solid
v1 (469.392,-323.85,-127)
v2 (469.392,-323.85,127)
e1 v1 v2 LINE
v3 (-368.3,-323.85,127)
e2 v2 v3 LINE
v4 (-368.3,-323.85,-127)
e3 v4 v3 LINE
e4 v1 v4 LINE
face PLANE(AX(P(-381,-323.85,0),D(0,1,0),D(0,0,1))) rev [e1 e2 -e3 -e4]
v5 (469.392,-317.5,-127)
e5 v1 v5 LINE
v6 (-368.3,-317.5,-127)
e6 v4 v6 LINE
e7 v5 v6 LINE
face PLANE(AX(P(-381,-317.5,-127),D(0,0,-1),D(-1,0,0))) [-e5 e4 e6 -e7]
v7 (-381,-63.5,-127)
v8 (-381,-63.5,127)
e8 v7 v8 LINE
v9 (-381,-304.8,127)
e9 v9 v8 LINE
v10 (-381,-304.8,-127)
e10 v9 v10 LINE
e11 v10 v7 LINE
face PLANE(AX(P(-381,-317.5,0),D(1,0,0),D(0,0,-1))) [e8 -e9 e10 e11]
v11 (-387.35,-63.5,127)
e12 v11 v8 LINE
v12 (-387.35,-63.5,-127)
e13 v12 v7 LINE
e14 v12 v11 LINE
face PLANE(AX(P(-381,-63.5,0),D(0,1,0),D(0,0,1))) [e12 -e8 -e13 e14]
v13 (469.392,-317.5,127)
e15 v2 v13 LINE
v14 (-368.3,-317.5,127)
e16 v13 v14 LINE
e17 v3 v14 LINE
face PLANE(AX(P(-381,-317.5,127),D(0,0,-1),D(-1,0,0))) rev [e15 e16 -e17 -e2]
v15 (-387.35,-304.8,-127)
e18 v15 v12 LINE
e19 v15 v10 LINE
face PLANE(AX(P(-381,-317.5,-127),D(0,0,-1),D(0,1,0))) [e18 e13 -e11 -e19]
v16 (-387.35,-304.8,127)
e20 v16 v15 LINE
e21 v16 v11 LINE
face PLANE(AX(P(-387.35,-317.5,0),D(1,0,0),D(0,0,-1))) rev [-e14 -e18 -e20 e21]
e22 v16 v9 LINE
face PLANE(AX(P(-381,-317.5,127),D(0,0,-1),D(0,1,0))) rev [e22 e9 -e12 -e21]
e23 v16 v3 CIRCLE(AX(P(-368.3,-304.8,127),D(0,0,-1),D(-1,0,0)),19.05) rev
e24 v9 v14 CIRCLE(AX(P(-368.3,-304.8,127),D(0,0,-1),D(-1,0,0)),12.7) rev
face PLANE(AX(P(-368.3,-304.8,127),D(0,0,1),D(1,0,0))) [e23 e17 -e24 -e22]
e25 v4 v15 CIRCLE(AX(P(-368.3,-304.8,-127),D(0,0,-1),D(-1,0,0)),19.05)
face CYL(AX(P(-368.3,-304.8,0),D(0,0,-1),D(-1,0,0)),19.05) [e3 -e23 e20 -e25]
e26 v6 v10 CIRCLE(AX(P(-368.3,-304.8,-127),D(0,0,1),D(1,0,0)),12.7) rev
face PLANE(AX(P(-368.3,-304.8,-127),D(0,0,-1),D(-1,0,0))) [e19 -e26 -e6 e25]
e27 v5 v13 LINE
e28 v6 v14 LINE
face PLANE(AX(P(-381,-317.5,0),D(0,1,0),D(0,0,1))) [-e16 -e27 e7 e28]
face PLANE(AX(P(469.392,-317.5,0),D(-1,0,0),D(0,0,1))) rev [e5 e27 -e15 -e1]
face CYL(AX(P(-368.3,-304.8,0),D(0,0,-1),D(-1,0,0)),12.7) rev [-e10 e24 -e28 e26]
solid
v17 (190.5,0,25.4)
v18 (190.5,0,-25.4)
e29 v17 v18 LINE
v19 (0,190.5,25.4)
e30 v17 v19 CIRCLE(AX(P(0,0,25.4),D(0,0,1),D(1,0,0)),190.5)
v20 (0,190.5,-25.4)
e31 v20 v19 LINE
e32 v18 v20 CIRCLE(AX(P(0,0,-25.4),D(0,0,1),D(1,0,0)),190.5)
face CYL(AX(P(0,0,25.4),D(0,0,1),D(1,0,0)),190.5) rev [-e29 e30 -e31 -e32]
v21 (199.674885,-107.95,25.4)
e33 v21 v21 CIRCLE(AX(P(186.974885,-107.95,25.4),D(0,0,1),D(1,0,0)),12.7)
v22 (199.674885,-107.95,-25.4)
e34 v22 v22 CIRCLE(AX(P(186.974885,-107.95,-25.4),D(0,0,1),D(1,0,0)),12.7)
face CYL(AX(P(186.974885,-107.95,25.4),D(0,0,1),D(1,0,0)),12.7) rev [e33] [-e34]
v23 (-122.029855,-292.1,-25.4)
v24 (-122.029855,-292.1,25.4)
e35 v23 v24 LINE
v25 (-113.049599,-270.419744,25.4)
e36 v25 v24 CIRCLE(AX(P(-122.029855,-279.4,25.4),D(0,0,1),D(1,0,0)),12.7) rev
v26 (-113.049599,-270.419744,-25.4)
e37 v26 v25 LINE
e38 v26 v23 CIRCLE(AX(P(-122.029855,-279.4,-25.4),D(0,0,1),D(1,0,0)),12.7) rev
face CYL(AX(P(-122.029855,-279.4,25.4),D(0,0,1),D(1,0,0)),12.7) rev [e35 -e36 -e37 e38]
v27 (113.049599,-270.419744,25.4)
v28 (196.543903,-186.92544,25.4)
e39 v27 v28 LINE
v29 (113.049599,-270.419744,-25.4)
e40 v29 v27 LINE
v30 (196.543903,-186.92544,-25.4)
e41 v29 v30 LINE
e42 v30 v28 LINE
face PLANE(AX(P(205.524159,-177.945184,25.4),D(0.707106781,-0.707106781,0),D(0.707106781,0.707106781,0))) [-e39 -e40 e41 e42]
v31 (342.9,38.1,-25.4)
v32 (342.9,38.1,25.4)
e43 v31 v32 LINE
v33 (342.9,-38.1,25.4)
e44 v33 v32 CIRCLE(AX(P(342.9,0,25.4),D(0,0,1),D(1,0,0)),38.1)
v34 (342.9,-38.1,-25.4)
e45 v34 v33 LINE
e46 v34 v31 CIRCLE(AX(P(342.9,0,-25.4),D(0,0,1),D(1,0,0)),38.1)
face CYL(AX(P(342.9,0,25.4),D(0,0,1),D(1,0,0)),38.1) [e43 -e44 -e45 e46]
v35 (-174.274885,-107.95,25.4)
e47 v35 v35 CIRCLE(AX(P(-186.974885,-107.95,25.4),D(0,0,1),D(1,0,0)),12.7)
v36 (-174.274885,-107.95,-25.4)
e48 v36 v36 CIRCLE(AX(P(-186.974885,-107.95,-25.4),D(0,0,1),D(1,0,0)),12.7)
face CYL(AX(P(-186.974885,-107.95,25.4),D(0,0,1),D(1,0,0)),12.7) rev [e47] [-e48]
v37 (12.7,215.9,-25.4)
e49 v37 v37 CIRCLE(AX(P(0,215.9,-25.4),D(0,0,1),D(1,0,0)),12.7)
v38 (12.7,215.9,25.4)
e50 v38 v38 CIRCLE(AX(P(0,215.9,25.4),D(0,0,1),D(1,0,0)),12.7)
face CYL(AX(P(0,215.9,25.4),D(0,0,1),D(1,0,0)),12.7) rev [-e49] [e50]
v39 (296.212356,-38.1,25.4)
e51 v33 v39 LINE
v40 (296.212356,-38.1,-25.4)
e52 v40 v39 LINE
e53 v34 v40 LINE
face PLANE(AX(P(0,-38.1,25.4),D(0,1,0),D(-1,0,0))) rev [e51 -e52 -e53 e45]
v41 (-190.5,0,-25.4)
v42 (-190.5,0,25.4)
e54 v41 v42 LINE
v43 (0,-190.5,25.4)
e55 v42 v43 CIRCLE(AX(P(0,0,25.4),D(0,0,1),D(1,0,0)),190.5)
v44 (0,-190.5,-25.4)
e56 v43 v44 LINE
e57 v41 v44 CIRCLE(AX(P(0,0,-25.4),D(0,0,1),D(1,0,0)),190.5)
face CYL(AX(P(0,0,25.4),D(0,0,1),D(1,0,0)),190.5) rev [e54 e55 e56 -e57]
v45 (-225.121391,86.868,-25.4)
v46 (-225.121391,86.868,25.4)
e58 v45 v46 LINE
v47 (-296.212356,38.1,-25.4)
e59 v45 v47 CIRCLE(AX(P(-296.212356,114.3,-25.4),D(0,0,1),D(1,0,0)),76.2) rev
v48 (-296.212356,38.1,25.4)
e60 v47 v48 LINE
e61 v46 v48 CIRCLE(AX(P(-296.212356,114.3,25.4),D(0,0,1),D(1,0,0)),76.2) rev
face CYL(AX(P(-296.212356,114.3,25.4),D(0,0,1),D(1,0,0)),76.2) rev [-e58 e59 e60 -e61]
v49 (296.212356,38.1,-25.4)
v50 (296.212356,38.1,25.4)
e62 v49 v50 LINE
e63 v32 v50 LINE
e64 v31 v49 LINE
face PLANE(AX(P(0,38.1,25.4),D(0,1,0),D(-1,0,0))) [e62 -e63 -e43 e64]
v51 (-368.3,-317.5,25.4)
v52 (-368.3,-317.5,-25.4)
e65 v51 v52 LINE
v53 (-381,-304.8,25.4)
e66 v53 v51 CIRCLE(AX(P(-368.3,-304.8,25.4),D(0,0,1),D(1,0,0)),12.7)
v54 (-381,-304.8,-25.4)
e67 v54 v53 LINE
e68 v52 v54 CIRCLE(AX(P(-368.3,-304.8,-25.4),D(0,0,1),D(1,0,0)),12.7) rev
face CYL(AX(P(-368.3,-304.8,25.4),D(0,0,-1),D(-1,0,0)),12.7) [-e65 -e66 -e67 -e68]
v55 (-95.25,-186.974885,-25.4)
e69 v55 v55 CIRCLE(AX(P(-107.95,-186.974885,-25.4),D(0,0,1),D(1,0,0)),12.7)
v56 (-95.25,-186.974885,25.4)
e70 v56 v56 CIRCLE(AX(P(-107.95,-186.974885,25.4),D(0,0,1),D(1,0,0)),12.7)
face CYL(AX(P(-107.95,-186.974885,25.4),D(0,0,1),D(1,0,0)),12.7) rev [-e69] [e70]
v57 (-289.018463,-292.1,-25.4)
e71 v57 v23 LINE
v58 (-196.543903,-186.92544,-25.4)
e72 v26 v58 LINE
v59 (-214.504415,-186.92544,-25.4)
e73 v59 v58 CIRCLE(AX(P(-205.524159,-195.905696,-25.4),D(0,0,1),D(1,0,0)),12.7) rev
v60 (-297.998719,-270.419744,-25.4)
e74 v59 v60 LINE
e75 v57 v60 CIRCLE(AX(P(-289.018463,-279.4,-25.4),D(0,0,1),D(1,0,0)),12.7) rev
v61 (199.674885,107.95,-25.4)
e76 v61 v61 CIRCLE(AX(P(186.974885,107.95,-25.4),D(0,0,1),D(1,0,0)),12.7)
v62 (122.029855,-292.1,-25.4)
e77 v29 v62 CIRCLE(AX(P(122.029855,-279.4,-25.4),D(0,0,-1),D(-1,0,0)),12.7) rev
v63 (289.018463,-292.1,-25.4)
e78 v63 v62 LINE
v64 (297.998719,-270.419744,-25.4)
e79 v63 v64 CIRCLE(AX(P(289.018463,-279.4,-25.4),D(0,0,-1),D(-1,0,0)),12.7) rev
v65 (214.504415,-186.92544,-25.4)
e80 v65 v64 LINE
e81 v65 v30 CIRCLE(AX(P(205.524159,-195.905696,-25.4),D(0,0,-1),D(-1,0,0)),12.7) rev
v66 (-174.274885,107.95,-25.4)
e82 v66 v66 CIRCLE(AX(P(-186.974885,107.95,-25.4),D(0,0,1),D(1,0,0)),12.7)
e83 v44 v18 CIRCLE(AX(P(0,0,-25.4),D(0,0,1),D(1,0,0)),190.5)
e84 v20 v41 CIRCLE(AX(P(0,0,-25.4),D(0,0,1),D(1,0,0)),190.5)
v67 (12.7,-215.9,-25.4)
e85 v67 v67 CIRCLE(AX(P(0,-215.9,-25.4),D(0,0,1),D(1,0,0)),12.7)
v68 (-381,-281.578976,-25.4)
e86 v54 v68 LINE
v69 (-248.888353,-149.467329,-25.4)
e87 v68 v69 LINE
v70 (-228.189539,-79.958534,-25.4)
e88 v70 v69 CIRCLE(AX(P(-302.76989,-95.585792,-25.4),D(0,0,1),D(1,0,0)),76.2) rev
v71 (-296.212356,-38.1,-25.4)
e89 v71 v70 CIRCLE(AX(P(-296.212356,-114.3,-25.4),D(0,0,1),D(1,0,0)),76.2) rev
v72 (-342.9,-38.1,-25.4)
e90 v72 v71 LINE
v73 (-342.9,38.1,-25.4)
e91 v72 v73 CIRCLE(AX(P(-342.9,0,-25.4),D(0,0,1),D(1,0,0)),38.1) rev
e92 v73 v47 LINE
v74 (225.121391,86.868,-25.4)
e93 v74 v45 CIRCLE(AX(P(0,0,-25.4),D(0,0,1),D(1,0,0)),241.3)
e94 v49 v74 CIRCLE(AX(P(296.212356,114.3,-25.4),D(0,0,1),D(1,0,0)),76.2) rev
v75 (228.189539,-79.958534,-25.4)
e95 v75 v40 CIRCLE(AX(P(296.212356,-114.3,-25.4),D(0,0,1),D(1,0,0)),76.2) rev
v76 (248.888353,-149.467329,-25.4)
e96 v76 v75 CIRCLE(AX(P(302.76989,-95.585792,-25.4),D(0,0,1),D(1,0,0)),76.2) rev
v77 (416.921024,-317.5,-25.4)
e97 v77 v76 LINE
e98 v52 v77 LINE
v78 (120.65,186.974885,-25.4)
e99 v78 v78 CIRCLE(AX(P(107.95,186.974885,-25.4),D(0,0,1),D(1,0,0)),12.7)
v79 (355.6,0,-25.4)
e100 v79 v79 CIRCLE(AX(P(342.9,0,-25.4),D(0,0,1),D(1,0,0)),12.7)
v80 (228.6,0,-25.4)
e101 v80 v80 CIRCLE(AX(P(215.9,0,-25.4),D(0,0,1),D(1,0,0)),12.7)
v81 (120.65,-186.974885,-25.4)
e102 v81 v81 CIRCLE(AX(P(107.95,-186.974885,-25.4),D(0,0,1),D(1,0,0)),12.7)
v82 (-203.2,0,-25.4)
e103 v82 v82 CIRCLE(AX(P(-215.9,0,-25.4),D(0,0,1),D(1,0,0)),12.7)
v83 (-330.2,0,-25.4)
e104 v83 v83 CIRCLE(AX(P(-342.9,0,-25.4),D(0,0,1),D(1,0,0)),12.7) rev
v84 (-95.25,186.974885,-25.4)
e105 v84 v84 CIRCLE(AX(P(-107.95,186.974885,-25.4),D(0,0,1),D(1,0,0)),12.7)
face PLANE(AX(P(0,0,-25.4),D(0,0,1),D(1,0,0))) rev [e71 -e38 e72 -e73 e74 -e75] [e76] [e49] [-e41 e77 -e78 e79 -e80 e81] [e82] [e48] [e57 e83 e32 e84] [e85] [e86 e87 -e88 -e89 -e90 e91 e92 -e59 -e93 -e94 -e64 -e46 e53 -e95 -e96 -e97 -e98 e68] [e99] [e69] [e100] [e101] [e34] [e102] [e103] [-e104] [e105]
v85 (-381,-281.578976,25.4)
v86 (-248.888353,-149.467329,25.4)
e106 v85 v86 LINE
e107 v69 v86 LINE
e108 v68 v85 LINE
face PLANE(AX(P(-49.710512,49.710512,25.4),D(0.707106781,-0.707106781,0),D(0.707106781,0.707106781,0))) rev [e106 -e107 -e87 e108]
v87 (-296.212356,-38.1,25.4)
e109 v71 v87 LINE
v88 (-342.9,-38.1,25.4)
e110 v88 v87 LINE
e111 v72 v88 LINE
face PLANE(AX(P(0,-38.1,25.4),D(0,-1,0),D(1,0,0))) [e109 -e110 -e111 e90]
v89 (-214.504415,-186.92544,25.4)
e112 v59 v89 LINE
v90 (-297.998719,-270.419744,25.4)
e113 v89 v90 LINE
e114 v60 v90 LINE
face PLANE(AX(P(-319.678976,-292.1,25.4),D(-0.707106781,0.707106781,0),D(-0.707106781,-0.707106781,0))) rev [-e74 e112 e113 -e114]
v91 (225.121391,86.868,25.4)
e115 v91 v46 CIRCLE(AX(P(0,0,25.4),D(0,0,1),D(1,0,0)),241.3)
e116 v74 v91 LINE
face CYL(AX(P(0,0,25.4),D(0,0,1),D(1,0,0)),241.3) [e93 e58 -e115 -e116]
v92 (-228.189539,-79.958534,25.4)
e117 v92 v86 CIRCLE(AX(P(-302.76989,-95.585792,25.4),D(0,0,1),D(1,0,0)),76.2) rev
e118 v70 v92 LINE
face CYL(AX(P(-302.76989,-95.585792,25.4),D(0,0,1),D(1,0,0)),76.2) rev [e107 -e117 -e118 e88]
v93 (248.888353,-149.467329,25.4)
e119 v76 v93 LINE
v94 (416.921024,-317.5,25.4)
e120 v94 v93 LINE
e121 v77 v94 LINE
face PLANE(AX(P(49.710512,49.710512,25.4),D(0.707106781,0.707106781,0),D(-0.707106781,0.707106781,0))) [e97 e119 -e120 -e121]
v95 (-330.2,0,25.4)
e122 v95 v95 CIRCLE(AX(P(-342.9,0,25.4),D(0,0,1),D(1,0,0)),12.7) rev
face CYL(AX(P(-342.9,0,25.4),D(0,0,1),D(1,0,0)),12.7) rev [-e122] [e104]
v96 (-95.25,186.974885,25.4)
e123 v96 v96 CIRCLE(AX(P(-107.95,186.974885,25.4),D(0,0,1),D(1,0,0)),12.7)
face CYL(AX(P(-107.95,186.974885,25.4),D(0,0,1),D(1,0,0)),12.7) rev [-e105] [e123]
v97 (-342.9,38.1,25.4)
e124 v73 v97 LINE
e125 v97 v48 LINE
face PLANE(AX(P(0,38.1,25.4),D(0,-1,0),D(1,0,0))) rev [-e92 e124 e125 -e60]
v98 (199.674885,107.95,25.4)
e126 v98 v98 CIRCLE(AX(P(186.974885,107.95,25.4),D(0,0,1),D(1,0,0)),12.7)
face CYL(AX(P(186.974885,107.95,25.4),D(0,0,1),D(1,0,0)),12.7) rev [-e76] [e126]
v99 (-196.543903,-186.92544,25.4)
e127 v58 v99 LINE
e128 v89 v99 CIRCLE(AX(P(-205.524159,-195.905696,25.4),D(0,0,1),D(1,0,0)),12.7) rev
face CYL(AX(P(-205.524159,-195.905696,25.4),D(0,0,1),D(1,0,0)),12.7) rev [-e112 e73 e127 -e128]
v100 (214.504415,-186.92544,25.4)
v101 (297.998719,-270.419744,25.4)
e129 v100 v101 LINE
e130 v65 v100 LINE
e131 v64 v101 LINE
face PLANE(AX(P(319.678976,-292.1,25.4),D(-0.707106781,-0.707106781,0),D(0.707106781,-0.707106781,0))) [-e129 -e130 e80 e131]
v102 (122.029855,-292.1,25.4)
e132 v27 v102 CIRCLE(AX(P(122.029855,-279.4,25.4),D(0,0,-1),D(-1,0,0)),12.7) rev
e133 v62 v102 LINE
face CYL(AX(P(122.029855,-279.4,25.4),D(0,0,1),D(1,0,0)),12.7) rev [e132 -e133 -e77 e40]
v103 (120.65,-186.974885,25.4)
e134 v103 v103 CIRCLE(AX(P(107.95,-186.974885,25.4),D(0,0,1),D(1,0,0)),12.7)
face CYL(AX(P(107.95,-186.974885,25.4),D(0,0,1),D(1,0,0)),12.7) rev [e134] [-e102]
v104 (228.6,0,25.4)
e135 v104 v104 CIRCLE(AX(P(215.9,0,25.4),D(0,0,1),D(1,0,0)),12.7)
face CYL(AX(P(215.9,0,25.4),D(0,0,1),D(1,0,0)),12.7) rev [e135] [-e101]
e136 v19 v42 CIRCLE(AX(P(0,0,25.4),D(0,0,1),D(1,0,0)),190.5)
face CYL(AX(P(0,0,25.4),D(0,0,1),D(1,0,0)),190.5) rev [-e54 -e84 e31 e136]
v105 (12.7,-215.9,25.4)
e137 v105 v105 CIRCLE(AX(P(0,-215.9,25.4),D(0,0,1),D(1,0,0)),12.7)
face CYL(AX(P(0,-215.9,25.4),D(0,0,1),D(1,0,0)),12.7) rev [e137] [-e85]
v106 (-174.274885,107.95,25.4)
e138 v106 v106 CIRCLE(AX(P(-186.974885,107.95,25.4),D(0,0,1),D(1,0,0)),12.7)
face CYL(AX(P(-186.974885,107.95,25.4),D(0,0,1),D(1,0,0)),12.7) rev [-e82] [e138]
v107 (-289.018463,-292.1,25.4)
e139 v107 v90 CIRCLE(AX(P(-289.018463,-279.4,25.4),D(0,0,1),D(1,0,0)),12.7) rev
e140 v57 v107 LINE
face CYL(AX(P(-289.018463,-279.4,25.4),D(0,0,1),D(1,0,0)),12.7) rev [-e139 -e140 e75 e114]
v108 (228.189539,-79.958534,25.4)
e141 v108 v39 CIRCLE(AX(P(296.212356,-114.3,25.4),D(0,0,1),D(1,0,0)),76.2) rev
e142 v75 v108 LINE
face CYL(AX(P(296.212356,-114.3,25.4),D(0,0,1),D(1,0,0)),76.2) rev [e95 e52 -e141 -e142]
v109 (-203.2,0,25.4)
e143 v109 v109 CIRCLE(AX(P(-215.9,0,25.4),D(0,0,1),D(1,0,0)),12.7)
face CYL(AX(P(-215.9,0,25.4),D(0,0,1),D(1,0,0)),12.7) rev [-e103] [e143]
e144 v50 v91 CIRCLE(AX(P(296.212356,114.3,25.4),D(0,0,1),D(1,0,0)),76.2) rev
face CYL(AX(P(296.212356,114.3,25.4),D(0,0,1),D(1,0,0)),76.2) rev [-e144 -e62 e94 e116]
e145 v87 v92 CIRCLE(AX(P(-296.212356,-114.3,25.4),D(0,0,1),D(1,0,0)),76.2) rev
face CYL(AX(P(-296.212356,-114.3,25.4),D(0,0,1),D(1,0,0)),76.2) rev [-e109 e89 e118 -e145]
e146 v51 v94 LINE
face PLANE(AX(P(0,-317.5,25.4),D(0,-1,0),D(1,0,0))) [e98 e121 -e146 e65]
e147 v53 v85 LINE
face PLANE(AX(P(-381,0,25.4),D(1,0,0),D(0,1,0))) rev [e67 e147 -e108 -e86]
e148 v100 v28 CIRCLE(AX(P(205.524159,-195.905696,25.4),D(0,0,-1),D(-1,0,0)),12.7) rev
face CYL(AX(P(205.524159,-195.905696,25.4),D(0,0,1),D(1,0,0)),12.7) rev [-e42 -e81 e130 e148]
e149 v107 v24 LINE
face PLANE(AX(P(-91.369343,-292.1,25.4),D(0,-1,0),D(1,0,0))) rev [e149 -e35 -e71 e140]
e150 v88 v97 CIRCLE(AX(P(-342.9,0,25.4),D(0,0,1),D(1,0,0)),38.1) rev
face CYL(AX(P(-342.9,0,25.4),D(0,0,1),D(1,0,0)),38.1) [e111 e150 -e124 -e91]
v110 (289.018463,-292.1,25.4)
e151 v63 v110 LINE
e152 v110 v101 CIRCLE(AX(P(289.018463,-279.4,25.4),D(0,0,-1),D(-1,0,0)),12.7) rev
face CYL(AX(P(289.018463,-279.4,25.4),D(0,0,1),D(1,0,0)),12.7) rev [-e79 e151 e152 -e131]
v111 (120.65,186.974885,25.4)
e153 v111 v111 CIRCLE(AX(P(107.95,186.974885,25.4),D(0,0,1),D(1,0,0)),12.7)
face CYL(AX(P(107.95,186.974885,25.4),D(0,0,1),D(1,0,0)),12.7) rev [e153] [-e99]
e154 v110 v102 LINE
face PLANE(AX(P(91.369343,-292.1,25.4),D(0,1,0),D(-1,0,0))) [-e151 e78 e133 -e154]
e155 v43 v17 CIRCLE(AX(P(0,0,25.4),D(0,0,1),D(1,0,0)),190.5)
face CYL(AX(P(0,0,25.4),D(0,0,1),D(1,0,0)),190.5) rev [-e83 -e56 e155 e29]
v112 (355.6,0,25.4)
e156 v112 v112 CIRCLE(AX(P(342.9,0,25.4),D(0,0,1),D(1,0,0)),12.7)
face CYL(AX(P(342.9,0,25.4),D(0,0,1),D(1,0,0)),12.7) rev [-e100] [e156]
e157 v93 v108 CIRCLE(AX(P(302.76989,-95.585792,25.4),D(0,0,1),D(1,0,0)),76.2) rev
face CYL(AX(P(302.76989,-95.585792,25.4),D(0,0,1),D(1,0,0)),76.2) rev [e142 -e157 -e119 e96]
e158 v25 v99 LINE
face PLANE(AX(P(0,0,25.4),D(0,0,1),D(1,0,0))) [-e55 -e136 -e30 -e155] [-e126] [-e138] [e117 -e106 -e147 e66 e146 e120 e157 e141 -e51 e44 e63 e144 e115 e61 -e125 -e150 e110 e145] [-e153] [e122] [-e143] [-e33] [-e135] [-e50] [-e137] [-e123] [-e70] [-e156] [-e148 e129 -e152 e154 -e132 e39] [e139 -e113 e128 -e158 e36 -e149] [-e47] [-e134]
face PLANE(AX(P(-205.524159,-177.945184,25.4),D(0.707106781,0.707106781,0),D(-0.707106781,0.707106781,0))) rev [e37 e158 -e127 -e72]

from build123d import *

# Parameters (mm, degrees)
BOSS_EXTRUDE2_DEPTH      = 25.4
BOSS_EXTRUDE2_DEPTH_BACK = 25.4
SKETCH1_R                = 241.3
SKETCH1_R_2              = 12.7
SKETCH1_R_3              = 190.5
SKETCH1_R_4              = 38.1
FILLET1_R                = 76.2
CUT_EXTRUDE1_DEPTH       = 127
FILLET2_R                = 12.7
FILLET2_OF_MIRROR2_R     = 12.7
CONVERT_SOLID2_START     = -127
CONVERT_SOLID2_DEPTH     = 254
FILLET3_R                = 12.7


# Read off the part's stored shape, not the designer's step: Convert-Solid2
with BuildPart() as part:
    # Sketch1 → Boss-Extrude2 (new, two sides: drawn at the far end of the back side and taken through both)
    # profile 1 of 6: a face of its own
    with BuildSketch(Plane.XY.offset(-BOSS_EXTRUDE2_DEPTH_BACK)):
        with BuildLine():
            Line((416.921024484, -317.5), (212.933396583, -113.512372099))
            ThreePointArc((212.933396583, -113.512372099), (0, -241.3), (-212.933396583, -113.512372099))
            Line((-212.933396583, -113.512372099), (-381, -281.578975516))
            Line((-381, -281.578975516), (-381, -317.5))
            Line((-381, -317.5), (416.921024484, -317.5))
        make_face()
    # profile 2 of 6: a face of its own
    with BuildSketch(Plane.XY.offset(-BOSS_EXTRUDE2_DEPTH_BACK)):
        Circle(SKETCH1_R)
        with Locations((186.974884677, 107.95)):
            Circle(SKETCH1_R_2, mode=Mode.SUBTRACT)
        with Locations((107.95, 186.974884677)):
            Circle(SKETCH1_R_2, mode=Mode.SUBTRACT)
        with Locations((0, 215.9)):
            Circle(SKETCH1_R_2, mode=Mode.SUBTRACT)
        with Locations((-107.95, 186.974884677)):
            Circle(SKETCH1_R_2, mode=Mode.SUBTRACT)
        with Locations((-186.974884677, 107.95)):
            Circle(SKETCH1_R_2, mode=Mode.SUBTRACT)
        with Locations((-215.9, 0)):
            Circle(SKETCH1_R_2, mode=Mode.SUBTRACT)
        with Locations((-186.974884677, -107.95)):
            Circle(SKETCH1_R_2, mode=Mode.SUBTRACT)
        with Locations((-107.95, -186.974884677)):
            Circle(SKETCH1_R_2, mode=Mode.SUBTRACT)
        with Locations((0, -215.9)):
            Circle(SKETCH1_R_2, mode=Mode.SUBTRACT)
        with Locations((107.95, -186.974884677)):
            Circle(SKETCH1_R_2, mode=Mode.SUBTRACT)
        with Locations((186.974884677, -107.95)):
            Circle(SKETCH1_R_2, mode=Mode.SUBTRACT)
        with Locations((215.9, 0)):
            Circle(SKETCH1_R_2, mode=Mode.SUBTRACT)
        Circle(SKETCH1_R_3, mode=Mode.SUBTRACT)
    # profile 3 of 6: a face of its own
    with BuildSketch(Plane.XY.offset(-BOSS_EXTRUDE2_DEPTH_BACK)):
        with BuildLine():
            ThreePointArc((342.9, -38.1), (304.8, 0), (342.9, 38.1))
            Line((342.9, 38.1), (238.273120599, 38.1))
            ThreePointArc((238.273120599, 38.1), (240.542089873, 19.110023541), (241.3, 0))
            ThreePointArc((241.3, 0), (240.542089873, -19.110023541), (238.273120599, -38.1))
            Line((238.273120599, -38.1), (342.9, -38.1))
        make_face()
    # profile 4 of 6: a face of its own
    with BuildSketch(Plane.XY.offset(-BOSS_EXTRUDE2_DEPTH_BACK)):
        with Locations((342.9, 0)):
            Circle(SKETCH1_R_4)
        with Locations((342.9, 0)):
            Circle(SKETCH1_R_2, mode=Mode.SUBTRACT)
    # profile 5 of 6: a face of its own
    with BuildSketch(Plane.XY.offset(-BOSS_EXTRUDE2_DEPTH_BACK)):
        with BuildLine():
            ThreePointArc((-238.273120599, -38.1), (-241.3, 0), (-238.273120599, 38.1))
            Line((-238.273120599, 38.1), (-342.9, 38.1))
            ThreePointArc((-342.9, 38.1), (-315.959231637, 26.940768363), (-304.8, 0))
            ThreePointArc((-304.8, 0), (-315.959231637, -26.940768363), (-342.9, -38.1))
            Line((-342.9, -38.1), (-238.273120599, -38.1))
        make_face()
    # profile 6 of 6: a face of its own
    with BuildSketch(Plane.XY.offset(-BOSS_EXTRUDE2_DEPTH_BACK)):
        with Locations((-342.9, 0)):
            Circle(SKETCH1_R_4)
        with Locations((-342.9, 0)):
            Circle(SKETCH1_R_2, mode=Mode.SUBTRACT)
    extrude(amount=BOSS_EXTRUDE2_DEPTH + BOSS_EXTRUDE2_DEPTH_BACK)

    # Fillet1
    # the kernel refuses this fillet: 76.2 mm, written as the material it adds along each edge
    with BuildSketch(Plane(origin=(-212.933396583, -113.512372099, -25.4), x_dir=(-0.7071067811865457, -0.7071067811865493, 0), z_dir=(0, 0, 1))) as fillet1_piece_1:
        with BuildLine():
            CenterArc((50.847987502, -76.2), FILLET1_R, 90, 62.521136884)
            ThreePointArc((-16.755213513, -41.039692655), (-7.433206057, -20.905415379), (0, 0))
            Line((0, 0), (50.847987502, 0))
        make_face()
    extrude(amount=50.8)
    with BuildSketch(Plane(origin=(-238.273120599, -38.1, -25.4), x_dir=(0.2603774212103102, -0.9655069127271274, 0), z_dir=(0, 0, 1)), Plane(origin=(238.273120599, 38.1, -25.4), x_dir=(-0.26037742121031, 0.9655069127271273, 0), z_dir=(0, 0, 1)), Plane(origin=(238.273120599, -38.1, 25.4), x_dir=(-0.26037742121030977, -0.9655069127271274, 0), z_dir=(0, 0, -1))) as fillet1_piece_2:
        with BuildLine():
            CenterArc((58.485557982, -75.781492043), FILLET1_R, 96.007737868, 68.899803976)
            Line((-15.086068768, -55.940732547), (0, 0))
            ThreePointArc((0, 0), (25.25512731, -1.325275196), (50.510254621, 0))
        make_face()
    extrude(amount=50.8)
    with BuildSketch(Plane(origin=(-238.273120599, 38.1, -25.4), x_dir=(-1, 0, 0), z_dir=(0, 0, 1))) as fillet1_piece_3:
        with BuildLine():
            CenterArc((57.939235659, -76.2), FILLET1_R, 90, 68.899803976)
            ThreePointArc((-13.151729843, -48.768), (-5.296302558, -24.729071738), (0, 0))
            Line((0, 0), (57.939235659, 0))
        make_face()
    extrude(amount=50.8)
    with BuildSketch(Plane(origin=(212.933396583, -113.512372099, 25.4), x_dir=(0.38737646378899676, 0.921921621019017, 0), z_dir=(0, 0, -1))) as fillet1_piece_4:
        with BuildLine():
            CenterArc((51.327444821, 75.877870562), FILLET1_R, 202.208646499, 62.521136884)
            Line((-19.219548021, 47.075756041), (0, 0))
            ThreePointArc((0, 0), (22.1641239, 1.020076553), (44.3282478, 0))
        make_face()
    extrude(amount=50.8)

    # Sketch4 → Cut-Extrude1 (cut)
    with BuildSketch(Plane.XY.offset(25.4)):
        Polygon((-319.678975516, -292.1), (-205.52415932, -177.945183804), (-91.369343124, -292.1), align=None)
    cut_extrude1 = extrude(amount=-CUT_EXTRUDE1_DEPTH, mode=Mode.SUBTRACT)

    # Fillet2
    fillet2_edges = [part.edges().sort_by_distance(p)[0] for p in [
        (-91.369343124, -292.1, 0),
        (-319.678975516, -292.1, 0),
        (-205.52415932, -177.945183804, 0),
    ]]
    fillet(fillet2_edges, radius=FILLET2_R)

    # Mirror2: Cut-Extrude1 across plane
    add(cut_extrude1.mirror(Plane(origin=(0, 0, 0), x_dir=(0, 0, 1), z_dir=(1, 0, 0))), mode=Mode.SUBTRACT)

    # Fillet2 of Mirror2
    fillet2_of_mirror2_edges = [part.edges().sort_by_distance(p)[0] for p in [
        (91.369343124, -292.1, 0),
        (319.678975516, -292.1, 0),
        (205.52415932, -177.945183804, 0),
    ]]
    fillet(fillet2_of_mirror2_edges, radius=FILLET2_OF_MIRROR2_R)

    # Fillet3
    fillet3_edges = [part.edges().sort_by_distance(p)[0] for p in [
        (-381, -317.5, 0),
    ]]
    fillet(fillet3_edges, radius=FILLET3_R)


with BuildPart() as body_2:
    # Convert-Solid2 outline → Convert-Solid2 (new body)
    with BuildSketch(Plane.XY.offset(CONVERT_SOLID2_START)):
        with BuildLine():
            Line((469.392, -323.85), (469.392, -317.5))
            Line((469.392, -317.5), (-368.3, -317.5))
            ThreePointArc((-368.3, -317.5), (-377.280256121, -313.780256121), (-381, -304.8))
            Line((-381, -304.8), (-381, -63.5))
            Line((-381, -63.5), (-387.35, -63.5))
            Line((-387.35, -63.5), (-387.35, -304.8))
            ThreePointArc((-387.35, -304.8), (-381.770384182, -318.270384182), (-368.3, -323.85))
            Line((-368.3, -323.85), (469.392, -323.85))
        make_face()
    extrude(amount=CONVERT_SOLID2_DEPTH)


solid = Compound([part.part, body_2.part])
